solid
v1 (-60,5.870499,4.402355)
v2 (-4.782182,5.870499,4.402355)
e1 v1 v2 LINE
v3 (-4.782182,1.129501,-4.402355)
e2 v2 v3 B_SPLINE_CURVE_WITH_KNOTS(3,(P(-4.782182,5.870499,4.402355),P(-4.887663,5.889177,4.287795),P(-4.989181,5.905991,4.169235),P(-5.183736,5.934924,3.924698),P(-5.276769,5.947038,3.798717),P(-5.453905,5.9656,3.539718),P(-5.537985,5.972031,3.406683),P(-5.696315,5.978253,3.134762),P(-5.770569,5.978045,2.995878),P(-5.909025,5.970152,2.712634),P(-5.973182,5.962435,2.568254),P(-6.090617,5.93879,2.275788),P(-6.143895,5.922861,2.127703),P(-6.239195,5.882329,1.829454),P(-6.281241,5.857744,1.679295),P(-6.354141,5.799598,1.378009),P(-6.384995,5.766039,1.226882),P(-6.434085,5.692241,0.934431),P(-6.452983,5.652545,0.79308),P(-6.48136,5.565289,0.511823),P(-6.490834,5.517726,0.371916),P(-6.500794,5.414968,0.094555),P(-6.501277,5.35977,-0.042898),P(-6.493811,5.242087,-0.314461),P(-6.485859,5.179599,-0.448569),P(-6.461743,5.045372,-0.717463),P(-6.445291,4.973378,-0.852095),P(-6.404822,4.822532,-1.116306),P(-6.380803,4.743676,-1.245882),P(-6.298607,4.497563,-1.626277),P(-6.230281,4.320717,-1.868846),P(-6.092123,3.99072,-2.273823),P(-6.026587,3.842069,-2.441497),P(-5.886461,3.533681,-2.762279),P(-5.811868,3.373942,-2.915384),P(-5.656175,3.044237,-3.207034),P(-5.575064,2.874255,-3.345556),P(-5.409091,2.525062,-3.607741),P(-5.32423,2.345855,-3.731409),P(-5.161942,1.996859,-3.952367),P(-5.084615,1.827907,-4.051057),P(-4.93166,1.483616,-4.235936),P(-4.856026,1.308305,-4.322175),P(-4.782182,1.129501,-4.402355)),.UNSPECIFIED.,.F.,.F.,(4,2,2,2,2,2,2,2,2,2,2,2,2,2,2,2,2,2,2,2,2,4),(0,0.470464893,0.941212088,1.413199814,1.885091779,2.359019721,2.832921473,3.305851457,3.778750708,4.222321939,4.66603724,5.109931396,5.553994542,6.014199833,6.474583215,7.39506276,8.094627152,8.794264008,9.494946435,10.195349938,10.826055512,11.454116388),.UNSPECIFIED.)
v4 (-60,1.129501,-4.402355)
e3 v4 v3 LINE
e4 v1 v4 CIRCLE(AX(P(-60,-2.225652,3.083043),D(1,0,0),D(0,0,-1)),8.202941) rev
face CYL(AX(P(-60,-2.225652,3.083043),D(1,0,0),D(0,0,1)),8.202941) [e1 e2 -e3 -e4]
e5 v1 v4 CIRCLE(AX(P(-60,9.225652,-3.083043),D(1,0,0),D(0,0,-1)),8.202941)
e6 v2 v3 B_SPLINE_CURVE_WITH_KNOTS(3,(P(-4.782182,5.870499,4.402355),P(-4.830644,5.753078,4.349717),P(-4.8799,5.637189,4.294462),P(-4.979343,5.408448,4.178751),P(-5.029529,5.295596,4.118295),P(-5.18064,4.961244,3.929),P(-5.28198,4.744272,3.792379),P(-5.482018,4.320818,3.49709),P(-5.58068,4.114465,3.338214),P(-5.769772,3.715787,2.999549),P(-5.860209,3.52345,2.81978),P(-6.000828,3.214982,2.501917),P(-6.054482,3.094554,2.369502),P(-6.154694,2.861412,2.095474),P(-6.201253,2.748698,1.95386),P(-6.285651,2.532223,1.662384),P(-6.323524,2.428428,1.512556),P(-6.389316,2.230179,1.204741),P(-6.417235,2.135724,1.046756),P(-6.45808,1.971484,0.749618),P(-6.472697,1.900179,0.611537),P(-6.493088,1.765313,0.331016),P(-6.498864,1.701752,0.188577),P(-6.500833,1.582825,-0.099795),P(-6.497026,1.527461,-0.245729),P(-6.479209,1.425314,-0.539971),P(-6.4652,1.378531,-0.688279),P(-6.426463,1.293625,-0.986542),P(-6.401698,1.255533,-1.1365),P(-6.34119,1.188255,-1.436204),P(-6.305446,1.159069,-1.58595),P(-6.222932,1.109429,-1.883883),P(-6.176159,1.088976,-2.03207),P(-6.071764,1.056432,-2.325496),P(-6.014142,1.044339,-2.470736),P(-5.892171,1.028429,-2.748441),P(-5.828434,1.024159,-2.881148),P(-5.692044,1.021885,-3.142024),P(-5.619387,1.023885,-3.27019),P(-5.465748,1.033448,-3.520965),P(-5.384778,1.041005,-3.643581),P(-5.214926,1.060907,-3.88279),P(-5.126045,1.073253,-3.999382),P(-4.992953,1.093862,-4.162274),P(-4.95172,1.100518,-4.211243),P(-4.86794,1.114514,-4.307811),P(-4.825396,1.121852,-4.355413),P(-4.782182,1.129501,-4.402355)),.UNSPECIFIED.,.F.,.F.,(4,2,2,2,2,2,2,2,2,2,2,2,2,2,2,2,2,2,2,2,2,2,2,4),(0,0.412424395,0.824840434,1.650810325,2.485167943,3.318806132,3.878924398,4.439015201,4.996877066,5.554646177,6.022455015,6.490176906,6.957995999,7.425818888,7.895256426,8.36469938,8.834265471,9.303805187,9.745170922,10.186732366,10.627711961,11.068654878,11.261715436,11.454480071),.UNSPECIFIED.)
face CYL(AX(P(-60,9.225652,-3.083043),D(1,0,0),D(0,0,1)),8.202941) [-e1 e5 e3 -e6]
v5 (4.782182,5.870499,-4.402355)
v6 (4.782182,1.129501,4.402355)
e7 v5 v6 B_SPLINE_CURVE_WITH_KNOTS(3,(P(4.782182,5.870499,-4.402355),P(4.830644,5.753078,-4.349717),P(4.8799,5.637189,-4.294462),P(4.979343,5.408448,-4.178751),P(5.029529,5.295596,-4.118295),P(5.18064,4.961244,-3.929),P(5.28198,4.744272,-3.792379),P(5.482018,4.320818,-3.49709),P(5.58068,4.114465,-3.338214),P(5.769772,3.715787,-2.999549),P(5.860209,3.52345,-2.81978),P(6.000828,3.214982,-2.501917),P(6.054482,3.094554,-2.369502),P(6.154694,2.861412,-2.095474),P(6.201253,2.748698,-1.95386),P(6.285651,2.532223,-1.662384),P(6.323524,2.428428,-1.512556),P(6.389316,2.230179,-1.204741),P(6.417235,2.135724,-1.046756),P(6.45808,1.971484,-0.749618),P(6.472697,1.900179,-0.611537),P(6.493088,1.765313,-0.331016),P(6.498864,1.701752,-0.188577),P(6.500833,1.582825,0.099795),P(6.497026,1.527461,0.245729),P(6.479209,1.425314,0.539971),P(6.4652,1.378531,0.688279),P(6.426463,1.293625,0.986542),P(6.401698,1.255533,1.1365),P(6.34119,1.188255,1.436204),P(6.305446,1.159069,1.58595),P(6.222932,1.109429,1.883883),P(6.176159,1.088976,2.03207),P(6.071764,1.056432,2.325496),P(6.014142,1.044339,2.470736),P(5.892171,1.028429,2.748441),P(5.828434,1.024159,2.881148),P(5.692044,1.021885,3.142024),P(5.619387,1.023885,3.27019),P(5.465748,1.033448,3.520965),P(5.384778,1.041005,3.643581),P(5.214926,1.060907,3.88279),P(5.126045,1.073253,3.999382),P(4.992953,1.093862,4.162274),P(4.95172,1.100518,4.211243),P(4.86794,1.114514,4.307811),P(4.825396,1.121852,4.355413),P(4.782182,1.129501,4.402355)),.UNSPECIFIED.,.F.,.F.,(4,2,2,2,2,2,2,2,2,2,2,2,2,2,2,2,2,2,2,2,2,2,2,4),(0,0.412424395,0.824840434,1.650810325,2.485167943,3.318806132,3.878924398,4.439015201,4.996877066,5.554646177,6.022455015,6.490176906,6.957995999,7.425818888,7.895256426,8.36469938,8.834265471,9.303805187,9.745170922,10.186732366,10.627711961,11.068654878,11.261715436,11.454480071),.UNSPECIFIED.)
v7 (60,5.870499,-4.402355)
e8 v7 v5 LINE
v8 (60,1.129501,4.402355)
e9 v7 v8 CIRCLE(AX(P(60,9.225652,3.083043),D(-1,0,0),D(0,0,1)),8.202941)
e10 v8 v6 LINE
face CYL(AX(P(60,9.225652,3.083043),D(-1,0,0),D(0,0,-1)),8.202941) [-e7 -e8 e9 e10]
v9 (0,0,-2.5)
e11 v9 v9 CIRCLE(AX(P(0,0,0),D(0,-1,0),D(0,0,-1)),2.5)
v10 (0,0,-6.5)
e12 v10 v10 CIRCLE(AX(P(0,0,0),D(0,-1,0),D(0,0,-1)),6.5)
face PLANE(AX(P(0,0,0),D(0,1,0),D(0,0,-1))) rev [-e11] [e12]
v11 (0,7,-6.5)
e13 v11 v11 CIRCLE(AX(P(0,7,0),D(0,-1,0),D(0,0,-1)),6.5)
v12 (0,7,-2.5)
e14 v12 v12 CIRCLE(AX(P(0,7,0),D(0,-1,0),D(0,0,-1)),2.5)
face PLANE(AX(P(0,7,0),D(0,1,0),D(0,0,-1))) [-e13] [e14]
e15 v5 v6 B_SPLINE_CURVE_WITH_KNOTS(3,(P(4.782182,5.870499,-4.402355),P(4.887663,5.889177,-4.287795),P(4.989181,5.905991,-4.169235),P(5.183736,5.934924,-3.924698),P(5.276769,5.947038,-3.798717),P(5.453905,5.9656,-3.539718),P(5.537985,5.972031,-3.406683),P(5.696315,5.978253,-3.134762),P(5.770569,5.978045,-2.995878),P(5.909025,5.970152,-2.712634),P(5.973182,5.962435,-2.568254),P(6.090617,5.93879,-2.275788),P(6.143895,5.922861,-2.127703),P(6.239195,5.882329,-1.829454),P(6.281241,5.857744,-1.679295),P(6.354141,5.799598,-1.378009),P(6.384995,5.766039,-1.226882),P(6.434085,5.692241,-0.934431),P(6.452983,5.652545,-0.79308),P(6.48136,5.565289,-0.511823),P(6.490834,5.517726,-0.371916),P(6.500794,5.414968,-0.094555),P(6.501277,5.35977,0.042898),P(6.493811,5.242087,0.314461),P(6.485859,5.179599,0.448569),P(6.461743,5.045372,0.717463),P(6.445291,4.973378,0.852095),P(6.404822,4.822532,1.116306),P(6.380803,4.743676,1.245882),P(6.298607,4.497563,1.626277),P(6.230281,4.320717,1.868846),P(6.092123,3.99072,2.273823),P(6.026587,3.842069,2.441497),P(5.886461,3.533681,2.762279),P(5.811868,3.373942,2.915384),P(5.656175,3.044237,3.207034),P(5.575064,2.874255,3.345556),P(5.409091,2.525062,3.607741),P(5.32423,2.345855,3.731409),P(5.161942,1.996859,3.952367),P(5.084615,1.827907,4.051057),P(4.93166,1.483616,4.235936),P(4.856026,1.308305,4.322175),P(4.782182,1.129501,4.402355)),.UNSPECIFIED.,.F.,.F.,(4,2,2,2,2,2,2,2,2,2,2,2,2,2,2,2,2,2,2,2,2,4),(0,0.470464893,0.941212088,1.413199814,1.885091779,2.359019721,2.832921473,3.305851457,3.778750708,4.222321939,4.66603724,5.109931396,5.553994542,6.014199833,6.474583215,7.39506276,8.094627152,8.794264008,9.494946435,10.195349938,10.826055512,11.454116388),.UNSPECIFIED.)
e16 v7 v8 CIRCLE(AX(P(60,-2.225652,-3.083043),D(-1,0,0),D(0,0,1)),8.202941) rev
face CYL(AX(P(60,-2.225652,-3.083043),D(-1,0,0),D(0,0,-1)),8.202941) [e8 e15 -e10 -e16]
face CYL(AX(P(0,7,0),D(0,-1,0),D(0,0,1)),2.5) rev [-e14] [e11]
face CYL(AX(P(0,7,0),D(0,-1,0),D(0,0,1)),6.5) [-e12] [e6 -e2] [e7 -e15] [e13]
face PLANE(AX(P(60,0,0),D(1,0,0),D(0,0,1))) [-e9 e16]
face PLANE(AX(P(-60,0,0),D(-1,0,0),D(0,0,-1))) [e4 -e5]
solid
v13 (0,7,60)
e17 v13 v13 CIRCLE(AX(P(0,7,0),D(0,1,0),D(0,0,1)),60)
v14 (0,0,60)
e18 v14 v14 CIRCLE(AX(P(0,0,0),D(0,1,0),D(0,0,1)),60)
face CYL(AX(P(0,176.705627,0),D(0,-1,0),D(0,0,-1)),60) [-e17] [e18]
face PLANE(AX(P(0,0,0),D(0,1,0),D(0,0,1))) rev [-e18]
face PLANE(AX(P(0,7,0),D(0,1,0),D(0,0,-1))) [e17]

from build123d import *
from build123d.topology import SkipClean

# Parameters (mm, degrees)
SKETCH1_R               = 6.5
SKETCH1_R_2             = 2.5
BOSS_EXTRUDE1_DEPTH     = 7
BOSS_EXTRUDE2_START     = 4
BOSS_EXTRUDE2_DEPTH     = 56
CIRPATTERN1_COUNT       = 2
BODY_MOVE_COPY1_START   = -60
BODY_MOVE_COPY1_DEPTH   = 55.217817956
BODY_MOVE_COPY1_START_2 = 4.782182044
BODY_MOVE_COPY1_2_DEPTH = 55.217817956
BODY_MOVE_COPY1_3_DEPTH = 55.217817956
BODY_MOVE_COPY1_4_DEPTH = 55.217817956
BODY_MOVE_COPY1_START_3 = -1e-07
BODY_MOVE_COPY1_5_DEPTH = 7.0000002
SKETCH4_R               = 60
BOSS_EXTRUDE4_DEPTH     = 7


with BuildPart() as part:
    # Sketch1 → Boss-Extrude1 (new body)
    with BuildSketch(Plane(origin=(0, 0, 0), x_dir=(1, 0, 0), z_dir=(0, 1, 0))):
        with Locations(Location((0, 0, 0), (0, 0, 270))):
            Circle(SKETCH1_R)
        with Locations(Location((0, 0, 0), (0, 0, 270))):
            Circle(SKETCH1_R_2, mode=Mode.SUBTRACT)
    extrude(amount=BOSS_EXTRUDE1_DEPTH)

    # Sketch2 → Boss-Extrude2 (add)
    with BuildSketch(Plane(origin=(0, 0, 0), x_dir=(0, 0, -1), z_dir=(1, 0, 0)).offset(BOSS_EXTRUDE2_START)):
        with BuildLine():
            ThreePointArc((-4.4023555, 5.870499115), (0.805969699, 4.99680087), (4.4023555, 1.129500885))
            Line((4.4023555, 1.129500885), (-4.4023555, 5.870499115))
        make_face()
        with BuildLine():
            Line((-4.4023555, 5.870499115), (4.4023555, 1.129500885))
            ThreePointArc((4.4023555, 1.129500885), (-0.805969699, 2.00319913), (-4.4023555, 5.870499115))
        make_face()
    boss_extrude2 = extrude(amount=BOSS_EXTRUDE2_DEPTH)

    # CirPattern1: Boss-Extrude2 ×2 about axis
    cirpattern1_axis = Axis((0, 7.76683161, 0), (0, -1, 0))
    for i in range(1, CIRPATTERN1_COUNT):
        add(boss_extrude2.rotate(cirpattern1_axis, i * 360 / CIRPATTERN1_COUNT))

    # Body-Move/Copy1: read off the stored shape, not the designer's step
    # Body-Move/Copy1 outline → Body-Move/Copy1 (cut)
    with BuildSketch(Plane.YZ.offset(BODY_MOVE_COPY1_START)):
        with BuildLine():
            ThreePointArc((3.5, 2.791065672), (2.385672983, 3.701050486), (1.129500885, 4.4023555))
            ThreePointArc((1.129500885, 4.4023555), (1.074002125, 2.16715462), (1.624132962, 0))
            ThreePointArc((1.624132962, 0), (2.417503652, 1.492693089), (3.5, 2.791065672))
        make_face()
        with BuildLine():
            ThreePointArc((5.870499115, -4.4023555), (5.925997875, -2.16715462), (5.375867038, 0))
            ThreePointArc((5.375867038, 0), (4.582496348, -1.492693089), (3.5, -2.791065672))
            ThreePointArc((3.5, -2.791065672), (4.614327017, -3.701050486), (5.870499115, -4.4023555))
        make_face()
    extrude(amount=BODY_MOVE_COPY1_DEPTH, mode=Mode.SUBTRACT)

    # Body-Move_Copy1 2 outline → Body-Move_Copy1 2 (cut)
    with BuildSketch(Plane.YZ.offset(BODY_MOVE_COPY1_START_2)):
        with BuildLine():
            ThreePointArc((5.870499115, 4.4023555), (4.614327017, 3.701050486), (3.5, 2.791065672))
            ThreePointArc((3.5, 2.791065672), (4.582496348, 1.492693089), (5.375867038, 0))
            ThreePointArc((5.375867038, 0), (5.925997875, 2.16715462), (5.870499115, 4.4023555))
        make_face()
        with BuildLine():
            ThreePointArc((3.5, -2.791065672), (2.417503652, -1.492693089), (1.624132962, 0))
            ThreePointArc((1.624132962, 0), (1.074002125, -2.16715462), (1.129500885, -4.4023555))
            ThreePointArc((1.129500885, -4.4023555), (2.385672983, -3.701050486), (3.5, -2.791065672))
        make_face()
    extrude(amount=BODY_MOVE_COPY1_2_DEPTH, mode=Mode.SUBTRACT)

    # Body-Move_Copy1 3 outline → Body-Move_Copy1 3 (add)
    with BuildSketch(Plane.YZ.offset(BODY_MOVE_COPY1_START)):
        with BuildLine():
            ThreePointArc((5.870499115, 4.4023555), (4.614327017, 3.701050486), (3.5, 2.791065672))
            ThreePointArc((3.5, 2.791065672), (4.582496348, 1.492693089), (5.375867038, 0))
            ThreePointArc((5.375867038, 0), (5.925997875, 2.16715462), (5.870499115, 4.4023555))
        make_face()
        with BuildLine():
            ThreePointArc((3.5, -2.791065672), (2.417503652, -1.492693089), (1.624132962, 0))
            ThreePointArc((1.624132962, 0), (1.074002125, -2.16715462), (1.129500885, -4.4023555))
            ThreePointArc((1.129500885, -4.4023555), (2.385672983, -3.701050486), (3.5, -2.791065672))
        make_face()
    extrude(amount=BODY_MOVE_COPY1_3_DEPTH)

    # Body-Move_Copy1 4 outline → Body-Move_Copy1 4 (add)
    with BuildSketch(Plane.YZ.offset(BODY_MOVE_COPY1_START_2)):
        with BuildLine():
            ThreePointArc((3.5, 2.791065672), (2.385672983, 3.701050486), (1.129500885, 4.4023555))
            ThreePointArc((1.129500885, 4.4023555), (1.074002125, 2.16715462), (1.624132962, 0))
            ThreePointArc((1.624132962, 0), (2.417503652, 1.492693089), (3.5, 2.791065672))
        make_face()
        with BuildLine():
            ThreePointArc((5.870499115, -4.4023555), (5.925997875, -2.16715462), (5.375867038, 0))
            ThreePointArc((5.375867038, 0), (4.582496348, -1.492693089), (3.5, -2.791065672))
            ThreePointArc((3.5, -2.791065672), (4.614327017, -3.701050486), (5.870499115, -4.4023555))
        make_face()
    extrude(amount=BODY_MOVE_COPY1_4_DEPTH)

    # Body-Move_Copy1 5 outline → Body-Move_Copy1 5 (add)
    with SkipClean():  # the faces are left unmerged after this step: merging them gives an invalid solid
        with BuildSketch(Plane(origin=(0, 0, 0), x_dir=(1, 0, 0), z_dir=(0, 1, 0)).offset(BODY_MOVE_COPY1_START_3)):
            with BuildLine():
                ThreePointArc((4.782182098, -4.402355549), (6.5, 0), (4.782182098, 4.402355549))
                Line((4.782182098, 4.402355549), (4.782182098, -4.402355549))
            make_face()
            with BuildLine():
                Line((-4.782182098, -4.402355549), (-4.782182098, 4.402355549))
                ThreePointArc((-4.782182098, 4.402355549), (-6.5, 0), (-4.782182098, -4.402355549))
            make_face()
        extrude(amount=BODY_MOVE_COPY1_5_DEPTH)


with BuildPart() as body_2:
    # Sketch4 → Boss-Extrude4 (new body)
    with BuildSketch(Plane(origin=(0, 0, 0), x_dir=(1, 0, 0), z_dir=(0, 1, 0))):
        with Locations(Location((0, 0, 0), (0, 0, 270))):
            Circle(SKETCH4_R)
    extrude(amount=BOSS_EXTRUDE4_DEPTH)


solid = Compound([part.part, body_2.part])
